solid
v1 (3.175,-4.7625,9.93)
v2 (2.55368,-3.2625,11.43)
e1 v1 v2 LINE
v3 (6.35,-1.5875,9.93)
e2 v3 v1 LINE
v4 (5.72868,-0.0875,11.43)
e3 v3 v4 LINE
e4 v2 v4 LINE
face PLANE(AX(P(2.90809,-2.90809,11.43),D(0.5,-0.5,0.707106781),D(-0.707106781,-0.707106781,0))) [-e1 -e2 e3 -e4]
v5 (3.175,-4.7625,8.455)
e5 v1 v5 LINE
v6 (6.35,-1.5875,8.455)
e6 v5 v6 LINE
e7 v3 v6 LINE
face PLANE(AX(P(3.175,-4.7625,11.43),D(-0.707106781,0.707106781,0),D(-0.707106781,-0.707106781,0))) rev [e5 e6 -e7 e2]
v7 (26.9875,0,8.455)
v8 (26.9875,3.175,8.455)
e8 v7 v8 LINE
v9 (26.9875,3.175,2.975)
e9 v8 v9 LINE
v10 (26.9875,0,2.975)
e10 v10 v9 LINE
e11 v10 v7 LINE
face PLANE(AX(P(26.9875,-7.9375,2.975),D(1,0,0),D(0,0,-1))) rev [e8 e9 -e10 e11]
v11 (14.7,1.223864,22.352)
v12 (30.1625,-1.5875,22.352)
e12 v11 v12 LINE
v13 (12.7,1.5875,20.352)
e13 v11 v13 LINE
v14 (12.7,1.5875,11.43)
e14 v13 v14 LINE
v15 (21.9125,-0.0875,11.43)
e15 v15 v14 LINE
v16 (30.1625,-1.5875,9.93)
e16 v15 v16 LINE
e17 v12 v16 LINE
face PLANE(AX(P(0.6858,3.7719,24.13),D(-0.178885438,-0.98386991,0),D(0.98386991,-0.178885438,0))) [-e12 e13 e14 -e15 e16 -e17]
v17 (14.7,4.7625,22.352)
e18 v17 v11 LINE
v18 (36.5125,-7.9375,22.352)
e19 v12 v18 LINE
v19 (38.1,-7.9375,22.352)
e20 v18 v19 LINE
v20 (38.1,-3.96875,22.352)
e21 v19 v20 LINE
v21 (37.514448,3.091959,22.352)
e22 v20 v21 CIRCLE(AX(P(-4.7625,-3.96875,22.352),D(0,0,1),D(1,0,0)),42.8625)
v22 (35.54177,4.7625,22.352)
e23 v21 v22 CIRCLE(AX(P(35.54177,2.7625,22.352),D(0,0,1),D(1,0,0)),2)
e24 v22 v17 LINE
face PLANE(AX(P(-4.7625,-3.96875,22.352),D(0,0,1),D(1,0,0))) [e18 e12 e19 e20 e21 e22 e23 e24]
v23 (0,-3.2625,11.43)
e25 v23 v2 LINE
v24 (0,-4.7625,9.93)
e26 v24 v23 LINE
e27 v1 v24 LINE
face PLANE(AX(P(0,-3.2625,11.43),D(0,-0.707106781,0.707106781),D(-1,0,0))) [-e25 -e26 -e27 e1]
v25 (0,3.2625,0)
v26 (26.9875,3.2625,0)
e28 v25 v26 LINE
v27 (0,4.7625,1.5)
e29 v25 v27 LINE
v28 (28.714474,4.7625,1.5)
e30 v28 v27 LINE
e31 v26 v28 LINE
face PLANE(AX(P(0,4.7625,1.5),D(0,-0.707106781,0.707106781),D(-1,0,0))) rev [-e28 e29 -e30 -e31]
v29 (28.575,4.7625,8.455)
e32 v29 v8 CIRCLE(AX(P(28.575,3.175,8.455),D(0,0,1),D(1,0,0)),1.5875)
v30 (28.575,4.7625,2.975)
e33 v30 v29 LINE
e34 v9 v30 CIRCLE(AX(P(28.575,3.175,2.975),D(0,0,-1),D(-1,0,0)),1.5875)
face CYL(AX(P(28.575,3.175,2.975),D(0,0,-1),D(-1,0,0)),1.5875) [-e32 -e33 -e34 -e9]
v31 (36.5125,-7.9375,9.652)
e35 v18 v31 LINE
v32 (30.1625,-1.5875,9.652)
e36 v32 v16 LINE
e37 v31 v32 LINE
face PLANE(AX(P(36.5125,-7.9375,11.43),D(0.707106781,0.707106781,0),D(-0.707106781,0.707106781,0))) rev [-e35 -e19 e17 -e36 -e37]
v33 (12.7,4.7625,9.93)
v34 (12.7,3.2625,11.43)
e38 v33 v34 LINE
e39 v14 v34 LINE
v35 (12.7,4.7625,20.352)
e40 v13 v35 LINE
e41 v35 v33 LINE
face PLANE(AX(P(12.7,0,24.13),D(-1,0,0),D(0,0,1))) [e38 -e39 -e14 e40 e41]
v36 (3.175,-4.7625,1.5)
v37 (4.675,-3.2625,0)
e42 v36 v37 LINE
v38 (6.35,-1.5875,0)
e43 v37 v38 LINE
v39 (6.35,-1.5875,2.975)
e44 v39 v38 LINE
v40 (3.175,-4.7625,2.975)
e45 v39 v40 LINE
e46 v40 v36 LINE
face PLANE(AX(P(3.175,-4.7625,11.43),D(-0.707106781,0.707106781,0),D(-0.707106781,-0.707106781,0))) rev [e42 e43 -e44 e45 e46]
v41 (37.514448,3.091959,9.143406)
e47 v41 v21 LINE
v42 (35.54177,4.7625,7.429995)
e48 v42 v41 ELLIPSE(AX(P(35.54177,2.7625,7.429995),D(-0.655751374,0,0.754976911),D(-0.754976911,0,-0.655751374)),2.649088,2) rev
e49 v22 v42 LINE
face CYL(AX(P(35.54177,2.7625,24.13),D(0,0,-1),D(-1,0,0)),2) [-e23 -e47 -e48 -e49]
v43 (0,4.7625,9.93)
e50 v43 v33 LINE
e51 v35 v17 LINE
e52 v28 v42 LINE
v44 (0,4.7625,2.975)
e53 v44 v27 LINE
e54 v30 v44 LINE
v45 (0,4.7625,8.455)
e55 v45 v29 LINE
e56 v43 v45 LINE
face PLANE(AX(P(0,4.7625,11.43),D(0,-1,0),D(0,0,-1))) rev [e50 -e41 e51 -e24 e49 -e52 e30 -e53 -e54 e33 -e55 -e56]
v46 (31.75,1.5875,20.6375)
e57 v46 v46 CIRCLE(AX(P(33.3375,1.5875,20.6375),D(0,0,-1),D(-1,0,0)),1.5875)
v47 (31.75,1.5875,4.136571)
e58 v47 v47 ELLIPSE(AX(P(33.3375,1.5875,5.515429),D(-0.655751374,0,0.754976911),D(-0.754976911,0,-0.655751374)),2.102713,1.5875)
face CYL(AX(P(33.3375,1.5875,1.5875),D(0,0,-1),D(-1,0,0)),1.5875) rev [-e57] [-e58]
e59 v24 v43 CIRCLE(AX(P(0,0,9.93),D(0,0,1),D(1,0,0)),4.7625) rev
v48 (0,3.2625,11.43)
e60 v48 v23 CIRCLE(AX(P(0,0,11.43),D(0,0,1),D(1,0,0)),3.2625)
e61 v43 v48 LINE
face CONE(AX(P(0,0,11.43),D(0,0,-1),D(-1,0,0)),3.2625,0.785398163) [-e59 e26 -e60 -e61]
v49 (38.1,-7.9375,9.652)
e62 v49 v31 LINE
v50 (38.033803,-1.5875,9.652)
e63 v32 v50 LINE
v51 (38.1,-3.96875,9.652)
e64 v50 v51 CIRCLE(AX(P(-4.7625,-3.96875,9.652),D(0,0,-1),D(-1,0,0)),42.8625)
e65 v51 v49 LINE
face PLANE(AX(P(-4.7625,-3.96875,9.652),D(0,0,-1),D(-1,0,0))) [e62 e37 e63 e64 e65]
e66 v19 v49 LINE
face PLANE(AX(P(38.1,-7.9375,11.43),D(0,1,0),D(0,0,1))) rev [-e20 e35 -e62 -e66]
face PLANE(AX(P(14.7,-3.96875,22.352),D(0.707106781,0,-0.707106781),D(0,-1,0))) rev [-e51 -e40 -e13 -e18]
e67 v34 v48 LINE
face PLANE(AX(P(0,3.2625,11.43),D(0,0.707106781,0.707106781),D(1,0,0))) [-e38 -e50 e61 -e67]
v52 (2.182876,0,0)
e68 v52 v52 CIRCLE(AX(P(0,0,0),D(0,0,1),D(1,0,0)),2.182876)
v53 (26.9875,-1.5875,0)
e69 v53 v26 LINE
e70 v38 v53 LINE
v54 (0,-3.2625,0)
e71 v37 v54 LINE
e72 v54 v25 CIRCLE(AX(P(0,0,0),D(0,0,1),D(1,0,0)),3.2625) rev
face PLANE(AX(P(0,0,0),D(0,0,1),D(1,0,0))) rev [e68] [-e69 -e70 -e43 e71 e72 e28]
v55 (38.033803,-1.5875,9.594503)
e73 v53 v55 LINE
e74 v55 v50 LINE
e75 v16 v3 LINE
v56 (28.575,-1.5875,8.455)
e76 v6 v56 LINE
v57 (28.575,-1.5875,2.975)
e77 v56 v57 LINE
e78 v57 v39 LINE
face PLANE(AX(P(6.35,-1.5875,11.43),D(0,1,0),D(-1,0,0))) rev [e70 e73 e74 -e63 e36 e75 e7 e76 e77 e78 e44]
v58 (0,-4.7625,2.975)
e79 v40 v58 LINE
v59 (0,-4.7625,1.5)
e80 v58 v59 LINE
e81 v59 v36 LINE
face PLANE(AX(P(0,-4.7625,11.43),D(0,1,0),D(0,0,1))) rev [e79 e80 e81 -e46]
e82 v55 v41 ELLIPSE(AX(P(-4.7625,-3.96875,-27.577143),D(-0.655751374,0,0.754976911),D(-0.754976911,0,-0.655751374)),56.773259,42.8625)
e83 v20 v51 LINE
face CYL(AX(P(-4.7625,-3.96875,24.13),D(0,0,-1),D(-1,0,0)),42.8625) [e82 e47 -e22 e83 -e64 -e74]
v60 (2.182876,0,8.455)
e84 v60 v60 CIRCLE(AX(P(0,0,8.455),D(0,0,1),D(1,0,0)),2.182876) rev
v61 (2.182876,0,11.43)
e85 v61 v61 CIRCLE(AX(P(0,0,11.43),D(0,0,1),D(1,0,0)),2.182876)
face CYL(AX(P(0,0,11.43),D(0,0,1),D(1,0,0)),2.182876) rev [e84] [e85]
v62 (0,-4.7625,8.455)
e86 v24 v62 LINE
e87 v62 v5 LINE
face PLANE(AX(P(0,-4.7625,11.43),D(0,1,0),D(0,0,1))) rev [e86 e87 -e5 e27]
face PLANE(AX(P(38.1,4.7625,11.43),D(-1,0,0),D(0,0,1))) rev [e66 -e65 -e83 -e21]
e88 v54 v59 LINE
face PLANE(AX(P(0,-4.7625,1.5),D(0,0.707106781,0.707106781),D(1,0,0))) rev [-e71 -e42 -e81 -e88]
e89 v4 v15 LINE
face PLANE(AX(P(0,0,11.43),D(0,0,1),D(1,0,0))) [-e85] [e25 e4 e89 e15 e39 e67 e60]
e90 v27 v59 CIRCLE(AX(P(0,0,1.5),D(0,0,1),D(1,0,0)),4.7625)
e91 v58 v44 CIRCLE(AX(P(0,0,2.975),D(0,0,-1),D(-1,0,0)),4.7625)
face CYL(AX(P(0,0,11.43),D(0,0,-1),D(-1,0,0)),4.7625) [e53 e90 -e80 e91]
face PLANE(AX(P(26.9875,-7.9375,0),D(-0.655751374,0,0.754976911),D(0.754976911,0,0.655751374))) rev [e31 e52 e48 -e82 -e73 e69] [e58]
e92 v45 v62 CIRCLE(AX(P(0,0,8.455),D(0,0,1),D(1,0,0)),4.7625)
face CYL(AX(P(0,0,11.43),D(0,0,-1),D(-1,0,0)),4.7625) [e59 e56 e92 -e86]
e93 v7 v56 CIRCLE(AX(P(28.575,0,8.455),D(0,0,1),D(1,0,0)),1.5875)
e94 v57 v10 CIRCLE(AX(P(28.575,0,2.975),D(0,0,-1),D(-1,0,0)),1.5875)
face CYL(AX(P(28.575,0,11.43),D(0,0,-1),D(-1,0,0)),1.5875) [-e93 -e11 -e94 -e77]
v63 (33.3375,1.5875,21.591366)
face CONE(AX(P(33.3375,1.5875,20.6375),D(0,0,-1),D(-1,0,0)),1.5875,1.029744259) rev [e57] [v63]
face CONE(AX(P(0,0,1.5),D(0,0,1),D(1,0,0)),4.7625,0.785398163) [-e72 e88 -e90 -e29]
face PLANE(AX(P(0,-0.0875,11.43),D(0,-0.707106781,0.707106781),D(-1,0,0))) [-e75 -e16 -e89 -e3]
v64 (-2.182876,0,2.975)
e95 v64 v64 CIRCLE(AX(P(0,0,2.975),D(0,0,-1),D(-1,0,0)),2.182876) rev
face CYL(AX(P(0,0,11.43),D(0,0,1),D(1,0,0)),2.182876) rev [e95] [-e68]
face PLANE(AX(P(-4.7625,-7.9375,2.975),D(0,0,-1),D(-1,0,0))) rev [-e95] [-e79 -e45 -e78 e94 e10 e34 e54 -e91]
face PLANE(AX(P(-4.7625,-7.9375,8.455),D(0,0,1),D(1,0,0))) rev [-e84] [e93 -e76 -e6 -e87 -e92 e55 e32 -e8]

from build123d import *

# Parameters (mm, degrees)
BOSS_EXTRUDE1_DEPTH              = 11.43
BOSS_EXTRUDE2_DEPTH              = 12.7
SKETCH3_W                        = 11.43
SKETCH3_H                        = 6.35
CUT_EXTRUDE1_DEPTH               = 12.7
F_11_64_0_17188_DIAMETER_HOLE1_D = 4.365752
FILLET5_R                        = 2
BOSS_EXTRUDE3_START              = 1.778
BOSS_EXTRUDE3_DEPTH              = 1.778
CUT_EXTRUDE8_DEPTH               = 41.937805342
CUT_EXTRUDE9_DEPTH               = 1.778
CUT_EXTRUDE10_DEPTH              = 46.962070275
SKETCH16_W                       = 31.75
SKETCH16_H                       = 5.48
CUT_EXTRUDE11_DEPTH              = 46.962070275
FILLET7_R                        = 1.5875
F_1_8_0_125_DIAMETER_HOLE1_D     = 3.175
F_1_8_0_125_DIAMETER_HOLE1_DEPTH = 19.05
F_1_8_0_125_DIAMETER_HOLE1_TIP   = 0.953866233
CHAMFER6_SIZE                    = 2


with BuildPart() as part:
    # Sketch1 → Boss-Extrude1 (new body)
    with BuildSketch(Plane.XY):
        with BuildLine():
            Line((0, -4.7625), (3.175, -4.7625))
            Line((3.175, -4.7625), (6.35, -1.5875))
            Line((6.35, -1.5875), (30.1625, -1.5875))
            Line((30.1625, -1.5875), (36.5125, -7.9375))
            Line((36.5125, -7.9375), (38.1, -7.9375))
            Line((38.1, -7.9375), (38.1, 4.7625))
            Line((38.1, 4.7625), (0, 4.7625))
            ThreePointArc((0, 4.7625), (-4.7625, 0), (0, -4.7625))
        make_face()
    extrude(amount=BOSS_EXTRUDE1_DEPTH)

    # Sketch2 → Boss-Extrude2 (add)
    with BuildSketch(Plane.XY.offset(11.43)):
        with BuildLine():
            ThreePointArc((38.1, -3.96875), (37.874729062, 0.419940487), (37.201284144, 4.7625))
            Line((37.201284144, 4.7625), (12.7, 4.7625))
            Line((12.7, 4.7625), (12.7, 1.5875))
            Line((12.7, 1.5875), (30.1625, -1.5875))
            Line((30.1625, -1.5875), (36.5125, -7.9375))
            Line((36.5125, -7.9375), (38.1, -7.9375))
            Line((38.1, -7.9375), (38.1, -3.96875))
        make_face()
    extrude(amount=BOSS_EXTRUDE2_DEPTH)

    # Sketch3 → Cut-Extrude1 (cut)
    with BuildSketch(Plane(origin=(38.1, 0, 0), x_dir=(0, 0, -1), z_dir=(1, 0, 0))):
        with Locations((-5.715, -4.7625)):
            Rectangle(SKETCH3_W, SKETCH3_H)
    extrude(amount=-CUT_EXTRUDE1_DEPTH, mode=Mode.SUBTRACT)

    # 11/64 (0.17188) Diameter Hole1 (through all)
    with Locations(Plane.XY.offset(11.43)):
        with Locations((0, 0)):
            Hole(F_11_64_0_17188_DIAMETER_HOLE1_D / 2)

    # Fillet5
    fillet5_edges = [part.edges().sort_by_distance(p)[0] for p in [
        (37.201284144, 4.7625, 17.78),
    ]]
    fillet(fillet5_edges, radius=FILLET5_R)

    # Chamfer5
    # the kernel refuses this chamfer: 1.5 mm, written as the material it takes off along each edge
    with BuildSketch(Plane(origin=(0.44731828, -7.49018172, 11.43), x_dir=(0.019442520806014003, -0.019442520806014, -0.9996219169112968), z_dir=(0.7071067811865475, 0.7071067811865477, 0))) as chamfer5_piece_1_section:
        with BuildLine():
            Line((1.543009793, 0), (-0.084820732, 1.54067669))
            Line((-0.084820732, 1.54067669), (-0.11480939, 1.539851814))
            ThreePointArc((-0.11480939, 1.539851814), (-0.051193841, 0.770096744), (-0.029988658, -0.000824876))
            Line((-0.029988658, -0.000824876), (0.000824876, -0.029988658))
            ThreePointArc((0.000824876, -0.029988658), (0.771746497, -0.008783474), (1.543834669, -0.029988658))
            Line((1.543834669, -0.029988658), (1.543009793, 0))
        make_face()
    chamfer5_piece_1 = extrude(amount=12.205177024, mode=Mode.PRIVATE)
    chamfer5_piece_1 = split(chamfer5_piece_1, bisect_by=Plane(origin=(4.06290207, -1.5875, 10.93530956), z_dir=(0, -1, 0)), keep=Keep.TOP, mode=Mode.PRIVATE)
    chamfer5_piece_1 = split(chamfer5_piece_1, bisect_by=Plane(origin=(4.06290207, -4.7625, 10.93530956), z_dir=(0, 1, 0)), keep=Keep.TOP, mode=Mode.PRIVATE)
    add(chamfer5_piece_1, mode=Mode.SUBTRACT)
    with BuildSketch(Plane(origin=(0, -4.7625, 0), x_dir=(0, -0.027495876610586202, 0.9996219169112968), z_dir=(1, 0, 0))) as chamfer5_piece_2_section:
        with BuildLine():
            Line((1.543009793, 0), (-0.084820732, -1.54067669))
            Line((-0.084820732, -1.54067669), (-0.11480939, -1.539851814))
            ThreePointArc((-0.11480939, -1.539851814), (-0.051193841, -0.770096744), (-0.029988658, 0.000824876))
            Line((-0.029988658, 0.000824876), (0.000824876, 0.029988658))
            ThreePointArc((0.000824876, 0.029988658), (0.771746497, 0.008783474), (1.543834669, 0.029988658))
            Line((1.543834669, 0.029988658), (1.543009793, 0))
        make_face()
    chamfer5_piece_2 = extrude(amount=7.032524482, mode=Mode.PRIVATE)
    chamfer5_piece_2 = split(chamfer5_piece_2, bisect_by=Plane(origin=(2.781469351, -5.156030649, 0.473875429), z_dir=(-0.7071067811865477, 0.7071067811865475, 0)), keep=Keep.TOP, mode=Mode.PRIVATE)
    add(chamfer5_piece_2, mode=Mode.SUBTRACT)
    with BuildSketch(Plane(origin=(0, 0, 0), x_dir=(0, 1, 0), z_dir=(1, 0, 0))) as chamfer5_piece_3:
        with BuildLine():
            Line((3.220073593, -0.042426407), (4.804926407, 1.542426407))
            Line((4.804926407, 1.542426407), (4.834926407, 1.542426407))
            ThreePointArc((4.834926407, 1.542426407), (4.7925, 0.771213203), (4.7925, 0))
            Line((4.7925, 0), (4.7625, -0.03))
            ThreePointArc((4.7625, -0.03), (3.991286797, -0.03), (3.220073593, -0.072426407))
            Line((3.220073593, -0.072426407), (3.220073593, -0.042426407))
        make_face()
    revolve(axis=Axis((0, 0, 0), (0, 0, 1)), revolution_arc=180, mode=Mode.SUBTRACT)
    with BuildSketch(Plane(origin=(2.492475518, -1.5875, 11.43), x_dir=(0, -0.027495876610586334, -0.9996219169112968), z_dir=(1, 0, 0))) as chamfer5_piece_4_section:
        with BuildLine():
            Line((1.543009793, 0), (-0.084820732, 1.54067669))
            Line((-0.084820732, 1.54067669), (-0.11480939, 1.539851814))
            ThreePointArc((-0.11480939, 1.539851814), (-0.051193841, 0.770096744), (-0.029988658, -0.000824876))
            Line((-0.029988658, -0.000824876), (0.000824876, -0.029988658))
            ThreePointArc((0.000824876, -0.029988658), (0.771746497, -0.008783474), (1.543834669, -0.029988658))
            Line((1.543834669, -0.029988658), (1.543009793, 0))
        make_face()
    chamfer5_piece_4 = extrude(amount=31.527548964, mode=Mode.PRIVATE)
    chamfer5_piece_4 = split(chamfer5_piece_4, bisect_by=Plane(origin=(17.615702577, 0.693735895, 10.888791896), z_dir=(-0.178885438199983, -0.9838699100999075, 0)), keep=Keep.TOP, mode=Mode.PRIVATE)
    chamfer5_piece_4 = split(chamfer5_piece_4, bisect_by=Plane(origin=(17.279834664, -1.153537628, 11.43), z_dir=(0, 0, -1)), keep=Keep.TOP, mode=Mode.PRIVATE)
    chamfer5_piece_4 = split(chamfer5_piece_4, bisect_by=Plane(origin=(12.031898518, 4.094398518, 10.888791896), z_dir=(0.7071067811865477, -0.7071067811865475, 0)), keep=Keep.TOP, mode=Mode.PRIVATE)
    add(chamfer5_piece_4, mode=Mode.SUBTRACT)
    with BuildSketch(Plane(origin=(12.7, 4.7625, 11.43), x_dir=(0, 0.02749587661058619, -0.9996219169112968), z_dir=(-1, 0, 0))) as chamfer5_piece_5:
        with BuildLine():
            Line((1.543009793, 0), (-0.084820732, 1.54067669))
            Line((-0.084820732, 1.54067669), (-0.11480939, 1.539851814))
            ThreePointArc((-0.11480939, 1.539851814), (-0.051193841, 0.770096744), (-0.029988658, -0.000824876))
            Line((-0.029988658, -0.000824876), (0.000824876, -0.029988658))
            ThreePointArc((0.000824876, -0.029988658), (0.771746497, -0.008783474), (1.543834669, -0.029988658))
            Line((1.543834669, -0.029988658), (1.543009793, 0))
        make_face()
    extrude(amount=12.7, mode=Mode.SUBTRACT)
    with BuildSketch(Plane(origin=(0, 0, 11.43), x_dir=(0, 1, 0), z_dir=(1, 0, 0))) as chamfer5_piece_6:
        with BuildLine():
            Line((4.804926407, -1.542426407), (3.220073593, 0.042426407))
            Line((3.220073593, 0.042426407), (3.220073593, 0.072426407))
            ThreePointArc((3.220073593, 0.072426407), (3.991286797, 0.03), (4.7625, 0.03))
            Line((4.7625, 0.03), (4.7925, 0))
            ThreePointArc((4.7925, 0), (4.7925, -0.771213203), (4.834926407, -1.542426407))
            Line((4.834926407, -1.542426407), (4.804926407, -1.542426407))
        make_face()
    revolve(axis=Axis((0, 0, 11.43), (0, 0, 1)), revolution_arc=180, mode=Mode.SUBTRACT)
    with BuildSketch(Plane(origin=(0, -4.7625, 11.43), x_dir=(0, -0.02749587661058619, -0.9996219169112968), z_dir=(1, 0, 0))) as chamfer5_piece_7_section:
        with BuildLine():
            Line((1.543009793, 0), (-0.084820732, 1.54067669))
            Line((-0.084820732, 1.54067669), (-0.11480939, 1.539851814))
            ThreePointArc((-0.11480939, 1.539851814), (-0.051193841, 0.770096744), (-0.029988658, -0.000824876))
            Line((-0.029988658, -0.000824876), (0.000824876, -0.029988658))
            ThreePointArc((0.000824876, -0.029988658), (0.771746497, -0.008783474), (1.543834669, -0.029988658))
            Line((1.543834669, -0.029988658), (1.543009793, 0))
        make_face()
    chamfer5_piece_7 = extrude(amount=7.032524482, mode=Mode.PRIVATE)
    chamfer5_piece_7 = split(chamfer5_piece_7, bisect_by=Plane(origin=(2.781469351, -5.156030649, 10.956124571), z_dir=(-0.7071067811865477, 0.7071067811865475, 0)), keep=Keep.TOP, mode=Mode.PRIVATE)
    add(chamfer5_piece_7, mode=Mode.SUBTRACT)
    with BuildSketch(Plane(origin=(38.1, 4.7625, 0), x_dir=(0, 0.027495876610586202, 0.9996219169112968), z_dir=(-1, 0, 0))) as chamfer5_piece_8:
        with BuildLine():
            Line((1.543009793, 0), (-0.084820732, -1.54067669))
            Line((-0.084820732, -1.54067669), (-0.11480939, -1.539851814))
            ThreePointArc((-0.11480939, -1.539851814), (-0.051193841, -0.770096744), (-0.029988658, 0.000824876))
            Line((-0.029988658, 0.000824876), (0.000824876, 0.029988658))
            ThreePointArc((0.000824876, 0.029988658), (0.771746497, 0.008783474), (1.543834669, 0.029988658))
            Line((1.543834669, 0.029988658), (1.543009793, 0))
        make_face()
    extrude(amount=38.1, mode=Mode.SUBTRACT)
    with BuildSketch(Plane(origin=(0.44731828, -7.49018172, 11.43), x_dir=(0.019442520806014003, -0.019442520806014, -0.9996219169112968), z_dir=(0.7071067811865475, 0.7071067811865477, 0))) as chamfer5_piece_9a_section:
        with BuildLine():
            Line((1.543009793, 0), (-0.084820732, 1.54067669))
            Line((-0.084820732, 1.54067669), (-0.11480939, 1.539851814))
            ThreePointArc((-0.11480939, 1.539851814), (-0.051193841, 0.770096744), (-0.029988658, -0.000824876))
            Line((-0.029988658, -0.000824876), (0.000824876, -0.029988658))
            ThreePointArc((0.000824876, -0.029988658), (0.771746497, -0.008783474), (1.543834669, -0.029988658))
            Line((1.543834669, -0.029988658), (1.543009793, 0))
        make_face()
    chamfer5_piece_9a = extrude(amount=12.205177024, mode=Mode.PRIVATE)
    chamfer5_piece_9a = split(chamfer5_piece_9a, bisect_by=Plane(origin=(1.331526221, -4.7625, 10.912595192), z_dir=(0, -1, 0)), keep=Keep.TOP, mode=Mode.PRIVATE)
    with BuildSketch(Plane(origin=(0, -4.7625, 11.43), x_dir=(0, -0.02749587661058619, -0.9996219169112968), z_dir=(1, 0, 0))) as chamfer5_piece_9b_section:
        with BuildLine():
            Line((1.543009793, 0), (-0.084820732, 1.54067669))
            Line((-0.084820732, 1.54067669), (-0.11480939, 1.539851814))
            ThreePointArc((-0.11480939, 1.539851814), (-0.051193841, 0.770096744), (-0.029988658, -0.000824876))
            Line((-0.029988658, -0.000824876), (0.000824876, -0.029988658))
            ThreePointArc((0.000824876, -0.029988658), (0.771746497, -0.008783474), (1.543834669, -0.029988658))
            Line((1.543834669, -0.029988658), (1.543009793, 0))
        make_face()
    chamfer5_piece_9b = extrude(amount=7.032524482, mode=Mode.PRIVATE)
    chamfer5_piece_9b = split(chamfer5_piece_9b, bisect_by=Plane(origin=(4.47853281, -3.45896719, 10.912595192), z_dir=(0.7071067811865477, -0.7071067811865475, 0)), keep=Keep.TOP, mode=Mode.PRIVATE)
    chamfer5_piece_9 = chamfer5_piece_9a & chamfer5_piece_9b
    add(chamfer5_piece_9, mode=Mode.SUBTRACT)
    with BuildSketch(Plane(origin=(2.492475518, -1.5875, 11.43), x_dir=(0, -0.027495876610586334, -0.9996219169112968), z_dir=(1, 0, 0))) as chamfer5_piece_10a_section:
        with BuildLine():
            Line((1.543009793, 0), (-0.084820732, 1.54067669))
            Line((-0.084820732, 1.54067669), (-0.11480939, 1.539851814))
            ThreePointArc((-0.11480939, 1.539851814), (-0.051193841, 0.770096744), (-0.029988658, -0.000824876))
            Line((-0.029988658, -0.000824876), (0.000824876, -0.029988658))
            ThreePointArc((0.000824876, -0.029988658), (0.771746497, -0.008783474), (1.543834669, -0.029988658))
            Line((1.543834669, -0.029988658), (1.543009793, 0))
        make_face()
    chamfer5_piece_10a = extrude(amount=31.527548964, mode=Mode.PRIVATE)
    chamfer5_piece_10a = split(chamfer5_piece_10a, bisect_by=Plane(origin=(4.673984199, -1.082007119, 11.43), z_dir=(0, 0, -1)), keep=Keep.TOP, mode=Mode.PRIVATE)
    chamfer5_piece_10a = split(chamfer5_piece_10a, bisect_by=Plane(origin=(5.76473854, -2.17276146, 10.926543667), z_dir=(-0.7071067811865477, 0.7071067811865475, 0)), keep=Keep.TOP, mode=Mode.PRIVATE)
    with BuildSketch(Plane(origin=(0.44731828, -7.49018172, 11.43), x_dir=(0.019442520806014003, -0.019442520806014, -0.9996219169112968), z_dir=(0.7071067811865475, 0.7071067811865477, 0))) as chamfer5_piece_10b_section:
        with BuildLine():
            Line((1.543009793, 0), (-0.084820732, 1.54067669))
            Line((-0.084820732, 1.54067669), (-0.11480939, 1.539851814))
            ThreePointArc((-0.11480939, 1.539851814), (-0.051193841, 0.770096744), (-0.029988658, -0.000824876))
            Line((-0.029988658, -0.000824876), (0.000824876, -0.029988658))
            ThreePointArc((0.000824876, -0.029988658), (0.771746497, -0.008783474), (1.543834669, -0.029988658))
            Line((1.543834669, -0.029988658), (1.543009793, 0))
        make_face()
    chamfer5_piece_10b = extrude(amount=12.205177024, mode=Mode.PRIVATE)
    chamfer5_piece_10b = split(chamfer5_piece_10b, bisect_by=Plane(origin=(7.154321547, -1.5875, 10.952860313), z_dir=(0, 1, 0)), keep=Keep.TOP, mode=Mode.PRIVATE)
    chamfer5_piece_10 = chamfer5_piece_10a & chamfer5_piece_10b
    add(chamfer5_piece_10, mode=Mode.SUBTRACT)
    with BuildSketch(Plane(origin=(2.492475518, -1.5875, 11.43), x_dir=(0, -0.027495876610586334, -0.9996219169112968), z_dir=(1, 0, 0))) as chamfer5_piece_11a_section:
        with BuildLine():
            Line((1.543009793, 0), (-0.084820732, 1.54067669))
            Line((-0.084820732, 1.54067669), (-0.11480939, 1.539851814))
            ThreePointArc((-0.11480939, 1.539851814), (-0.051193841, 0.770096744), (-0.029988658, -0.000824876))
            Line((-0.029988658, -0.000824876), (0.000824876, -0.029988658))
            ThreePointArc((0.000824876, -0.029988658), (0.771746497, -0.008783474), (1.543834669, -0.029988658))
            Line((1.543834669, -0.029988658), (1.543009793, 0))
        make_face()
    chamfer5_piece_11a = extrude(amount=31.527548964, mode=Mode.PRIVATE)
    chamfer5_piece_11a = split(chamfer5_piece_11a, bisect_by=Plane(origin=(4.893812688, -0.642350142, 11.43), z_dir=(0, 0, 1)), keep=Keep.TOP, mode=Mode.PRIVATE)
    chamfer5_piece_11a = split(chamfer5_piece_11a, bisect_by=Plane(origin=(6.094481273, -1.843018727, 11.451821906), z_dir=(-0.7071067811865477, 0.7071067811865475, 0)), keep=Keep.TOP, mode=Mode.PRIVATE)
    with BuildSketch(Plane(origin=(0.44731828, -7.49018172, 11.43), x_dir=(0.019442520806014003, -0.019442520806014, -0.9996219169112968), z_dir=(0.7071067811865475, 0.7071067811865477, 0))) as chamfer5_piece_11b_section:
        with BuildLine():
            Line((1.543009793, 0), (-0.084820732, 1.54067669))
            Line((-0.084820732, 1.54067669), (-0.11480939, 1.539851814))
            ThreePointArc((-0.11480939, 1.539851814), (-0.051193841, 0.770096744), (-0.029988658, -0.000824876))
            Line((-0.029988658, -0.000824876), (0.000824876, -0.029988658))
            ThreePointArc((0.000824876, -0.029988658), (0.771746497, -0.008783474), (1.543834669, -0.029988658))
            Line((1.543834669, -0.029988658), (1.543009793, 0))
        make_face()
    chamfer5_piece_11b = extrude(amount=12.205177024, mode=Mode.PRIVATE)
    chamfer5_piece_11b = split(chamfer5_piece_11b, bisect_by=Plane(origin=(7.154321547, -1.5875, 10.952860313), z_dir=(0, 1, 0)), keep=Keep.TOP, mode=Mode.PRIVATE)
    chamfer5_piece_11 = chamfer5_piece_11a & chamfer5_piece_11b
    add(chamfer5_piece_11, mode=Mode.SUBTRACT)
    with BuildSketch(Plane(origin=(2.492475518, -1.5875, 11.43), x_dir=(0, -0.027495876610586334, -0.9996219169112968), z_dir=(1, 0, 0))) as chamfer5_piece_12a_section:
        with BuildLine():
            Line((1.543009793, 0), (-0.084820732, 1.54067669))
            Line((-0.084820732, 1.54067669), (-0.11480939, 1.539851814))
            ThreePointArc((-0.11480939, 1.539851814), (-0.051193841, 0.770096744), (-0.029988658, -0.000824876))
            Line((-0.029988658, -0.000824876), (0.000824876, -0.029988658))
            ThreePointArc((0.000824876, -0.029988658), (0.771746497, -0.008783474), (1.543834669, -0.029988658))
            Line((1.543834669, -0.029988658), (1.543009793, 0))
        make_face()
    chamfer5_piece_12a = extrude(amount=31.527548964, mode=Mode.PRIVATE)
    chamfer5_piece_12a = split(chamfer5_piece_12a, bisect_by=Plane(origin=(16.694095018, 0.861300906, 11.44990258), z_dir=(-0.178885438199983, -0.9838699100999075, 0)), keep=Keep.TOP, mode=Mode.PRIVATE)
    chamfer5_piece_12a = split(chamfer5_piece_12a, bisect_by=Plane(origin=(16.398943836, -0.762030594, 11.43), z_dir=(0, 0, 1)), keep=Keep.TOP, mode=Mode.PRIVATE)
    chamfer5_piece_12a = split(chamfer5_piece_12a, bisect_by=Plane(origin=(11.787206621, 3.849706621, 11.44990258), z_dir=(0.7071067811865477, -0.7071067811865475, 0)), keep=Keep.TOP, mode=Mode.PRIVATE)
    with BuildSketch(Plane(origin=(0.44731828, -7.49018172, 11.43), x_dir=(0.019442520806014003, -0.019442520806014, -0.9996219169112968), z_dir=(0.7071067811865475, 0.7071067811865477, 0))) as chamfer5_piece_12b_section:
        with BuildLine():
            Line((1.543009793, 0), (-0.084820732, 1.54067669))
            Line((-0.084820732, 1.54067669), (-0.11480939, 1.539851814))
            ThreePointArc((-0.11480939, 1.539851814), (-0.051193841, 0.770096744), (-0.029988658, -0.000824876))
            Line((-0.029988658, -0.000824876), (0.000824876, -0.029988658))
            ThreePointArc((0.000824876, -0.029988658), (0.771746497, -0.008783474), (1.543834669, -0.029988658))
            Line((1.543834669, -0.029988658), (1.543009793, 0))
        make_face()
    chamfer5_piece_12b = extrude(amount=12.205177024, mode=Mode.PRIVATE)
    chamfer5_piece_12b = split(chamfer5_piece_12b, bisect_by=Plane(origin=(7.154321547, -1.5875, 10.952860313), z_dir=(0, 1, 0)), keep=Keep.TOP, mode=Mode.PRIVATE)
    chamfer5_piece_12 = chamfer5_piece_12a & chamfer5_piece_12b
    add(chamfer5_piece_12, mode=Mode.SUBTRACT)

    # Sketch12 → Boss-Extrude3 (add)
    with BuildSketch(Plane(origin=(0, 0, 11.43), x_dir=(-1, 0, 0), z_dir=(0, 0, -1)).offset(BOSS_EXTRUDE3_START)):
        with BuildLine():
            Line((-38.1, -7.9375), (-36.5125, -7.9375))
            Line((-36.5125, -7.9375), (-30.1625, -1.5875))
            Line((-30.1625, -1.5875), (-38.033803049, -1.5875))
            ThreePointArc((-38.033803049, -1.5875), (-38.083447566, -2.777665033), (-38.1, -3.96875))
            Line((-38.1, -3.96875), (-38.1, -7.9375))
        make_face()
    extrude(amount=-BOSS_EXTRUDE3_DEPTH)

    # Sketch14 → Cut-Extrude8 (cut, through all)
    with BuildSketch(Plane.XY.offset(11.43)):
        with BuildLine():
            Line((38.033803049, -1.5875), (38.1, -1.5875))
            Line((38.1, -1.5875), (38.1, 4.7625))
            Line((38.1, 4.7625), (35.541769993, 4.7625))
            ThreePointArc((35.541769993, 4.7625), (36.834264268, 4.288756384), (37.514447631, 3.09195855))
            ThreePointArc((37.514447631, 3.09195855), (37.838425206, 0.759365674), (38.033803049, -1.5875))
        make_face()
    extrude(amount=-CUT_EXTRUDE8_DEPTH, mode=Mode.SUBTRACT)

    # Sketch15 → Cut-Extrude9 (cut)
    with BuildSketch(Plane.XY.offset(24.13)):
        with BuildLine():
            Line((35.541769993, 4.7625), (12.7, 4.7625))
            Line((12.7, 4.7625), (12.7, 1.5875))
            Line((12.7, 1.5875), (30.1625, -1.5875))
            Line((30.1625, -1.5875), (36.5125, -7.9375))
            Line((36.5125, -7.9375), (38.1, -7.9375))
            Line((38.1, -7.9375), (38.1, -3.96875))
            ThreePointArc((38.1, -3.96875), (37.953361071, -0.426276401), (37.514447631, 3.09195855))
            ThreePointArc((37.514447631, 3.09195855), (36.834264268, 4.288756384), (35.541769993, 4.7625))
        make_face()
    extrude(amount=-CUT_EXTRUDE9_DEPTH, mode=Mode.SUBTRACT)

    # Sketch10 → Cut-Extrude10 (cut, through all)
    with BuildSketch(Plane(origin=(0, 4.7625, 0), x_dir=(1, 0, 0), z_dir=(0, 1, 0))):
        Polygon((26.9875, 0), (38.1, 0), (38.1, -9.652), align=None)
    extrude(amount=-CUT_EXTRUDE10_DEPTH, mode=Mode.SUBTRACT)

    # Sketch16 → Cut-Extrude11 (cut, through all)
    with BuildSketch(Plane(origin=(0, 4.7625, 0), x_dir=(1, 0, 0), z_dir=(0, 1, 0))):
        with Locations((11.1125, -5.715)):
            Rectangle(SKETCH16_W, SKETCH16_H)
    extrude(amount=-CUT_EXTRUDE11_DEPTH, mode=Mode.SUBTRACT)

    # Fillet7
    fillet7_edges = [part.edges().sort_by_distance(p)[0] for p in [
        (26.9875, -1.5875, 5.715),
        (26.9875, 4.7625, 5.715),
    ]]
    fillet(fillet7_edges, radius=FILLET7_R)

    # 1/8 (0.125) Diameter Hole1
    with Locations(Plane(origin=(0, 0, 1.5875), x_dir=(-1, 0, 0), z_dir=(0, 0, -1))):
        with Locations((-33.3375, 1.5875)):
            Hole(F_1_8_0_125_DIAMETER_HOLE1_D / 2, depth=F_1_8_0_125_DIAMETER_HOLE1_DEPTH)
            with Locations((0, 0, -(F_1_8_0_125_DIAMETER_HOLE1_DEPTH + F_1_8_0_125_DIAMETER_HOLE1_TIP / 2))):  # 118° drill point
                Cone(0, F_1_8_0_125_DIAMETER_HOLE1_D / 2, F_1_8_0_125_DIAMETER_HOLE1_TIP, mode=Mode.SUBTRACT)

    # Chamfer6
    chamfer6_edges = [part.edges().sort_by_distance(p)[0] for p in [
        (12.7, 3.175, 22.352),
    ]]
    chamfer(chamfer6_edges, length=CHAMFER6_SIZE)


solid = part.part
